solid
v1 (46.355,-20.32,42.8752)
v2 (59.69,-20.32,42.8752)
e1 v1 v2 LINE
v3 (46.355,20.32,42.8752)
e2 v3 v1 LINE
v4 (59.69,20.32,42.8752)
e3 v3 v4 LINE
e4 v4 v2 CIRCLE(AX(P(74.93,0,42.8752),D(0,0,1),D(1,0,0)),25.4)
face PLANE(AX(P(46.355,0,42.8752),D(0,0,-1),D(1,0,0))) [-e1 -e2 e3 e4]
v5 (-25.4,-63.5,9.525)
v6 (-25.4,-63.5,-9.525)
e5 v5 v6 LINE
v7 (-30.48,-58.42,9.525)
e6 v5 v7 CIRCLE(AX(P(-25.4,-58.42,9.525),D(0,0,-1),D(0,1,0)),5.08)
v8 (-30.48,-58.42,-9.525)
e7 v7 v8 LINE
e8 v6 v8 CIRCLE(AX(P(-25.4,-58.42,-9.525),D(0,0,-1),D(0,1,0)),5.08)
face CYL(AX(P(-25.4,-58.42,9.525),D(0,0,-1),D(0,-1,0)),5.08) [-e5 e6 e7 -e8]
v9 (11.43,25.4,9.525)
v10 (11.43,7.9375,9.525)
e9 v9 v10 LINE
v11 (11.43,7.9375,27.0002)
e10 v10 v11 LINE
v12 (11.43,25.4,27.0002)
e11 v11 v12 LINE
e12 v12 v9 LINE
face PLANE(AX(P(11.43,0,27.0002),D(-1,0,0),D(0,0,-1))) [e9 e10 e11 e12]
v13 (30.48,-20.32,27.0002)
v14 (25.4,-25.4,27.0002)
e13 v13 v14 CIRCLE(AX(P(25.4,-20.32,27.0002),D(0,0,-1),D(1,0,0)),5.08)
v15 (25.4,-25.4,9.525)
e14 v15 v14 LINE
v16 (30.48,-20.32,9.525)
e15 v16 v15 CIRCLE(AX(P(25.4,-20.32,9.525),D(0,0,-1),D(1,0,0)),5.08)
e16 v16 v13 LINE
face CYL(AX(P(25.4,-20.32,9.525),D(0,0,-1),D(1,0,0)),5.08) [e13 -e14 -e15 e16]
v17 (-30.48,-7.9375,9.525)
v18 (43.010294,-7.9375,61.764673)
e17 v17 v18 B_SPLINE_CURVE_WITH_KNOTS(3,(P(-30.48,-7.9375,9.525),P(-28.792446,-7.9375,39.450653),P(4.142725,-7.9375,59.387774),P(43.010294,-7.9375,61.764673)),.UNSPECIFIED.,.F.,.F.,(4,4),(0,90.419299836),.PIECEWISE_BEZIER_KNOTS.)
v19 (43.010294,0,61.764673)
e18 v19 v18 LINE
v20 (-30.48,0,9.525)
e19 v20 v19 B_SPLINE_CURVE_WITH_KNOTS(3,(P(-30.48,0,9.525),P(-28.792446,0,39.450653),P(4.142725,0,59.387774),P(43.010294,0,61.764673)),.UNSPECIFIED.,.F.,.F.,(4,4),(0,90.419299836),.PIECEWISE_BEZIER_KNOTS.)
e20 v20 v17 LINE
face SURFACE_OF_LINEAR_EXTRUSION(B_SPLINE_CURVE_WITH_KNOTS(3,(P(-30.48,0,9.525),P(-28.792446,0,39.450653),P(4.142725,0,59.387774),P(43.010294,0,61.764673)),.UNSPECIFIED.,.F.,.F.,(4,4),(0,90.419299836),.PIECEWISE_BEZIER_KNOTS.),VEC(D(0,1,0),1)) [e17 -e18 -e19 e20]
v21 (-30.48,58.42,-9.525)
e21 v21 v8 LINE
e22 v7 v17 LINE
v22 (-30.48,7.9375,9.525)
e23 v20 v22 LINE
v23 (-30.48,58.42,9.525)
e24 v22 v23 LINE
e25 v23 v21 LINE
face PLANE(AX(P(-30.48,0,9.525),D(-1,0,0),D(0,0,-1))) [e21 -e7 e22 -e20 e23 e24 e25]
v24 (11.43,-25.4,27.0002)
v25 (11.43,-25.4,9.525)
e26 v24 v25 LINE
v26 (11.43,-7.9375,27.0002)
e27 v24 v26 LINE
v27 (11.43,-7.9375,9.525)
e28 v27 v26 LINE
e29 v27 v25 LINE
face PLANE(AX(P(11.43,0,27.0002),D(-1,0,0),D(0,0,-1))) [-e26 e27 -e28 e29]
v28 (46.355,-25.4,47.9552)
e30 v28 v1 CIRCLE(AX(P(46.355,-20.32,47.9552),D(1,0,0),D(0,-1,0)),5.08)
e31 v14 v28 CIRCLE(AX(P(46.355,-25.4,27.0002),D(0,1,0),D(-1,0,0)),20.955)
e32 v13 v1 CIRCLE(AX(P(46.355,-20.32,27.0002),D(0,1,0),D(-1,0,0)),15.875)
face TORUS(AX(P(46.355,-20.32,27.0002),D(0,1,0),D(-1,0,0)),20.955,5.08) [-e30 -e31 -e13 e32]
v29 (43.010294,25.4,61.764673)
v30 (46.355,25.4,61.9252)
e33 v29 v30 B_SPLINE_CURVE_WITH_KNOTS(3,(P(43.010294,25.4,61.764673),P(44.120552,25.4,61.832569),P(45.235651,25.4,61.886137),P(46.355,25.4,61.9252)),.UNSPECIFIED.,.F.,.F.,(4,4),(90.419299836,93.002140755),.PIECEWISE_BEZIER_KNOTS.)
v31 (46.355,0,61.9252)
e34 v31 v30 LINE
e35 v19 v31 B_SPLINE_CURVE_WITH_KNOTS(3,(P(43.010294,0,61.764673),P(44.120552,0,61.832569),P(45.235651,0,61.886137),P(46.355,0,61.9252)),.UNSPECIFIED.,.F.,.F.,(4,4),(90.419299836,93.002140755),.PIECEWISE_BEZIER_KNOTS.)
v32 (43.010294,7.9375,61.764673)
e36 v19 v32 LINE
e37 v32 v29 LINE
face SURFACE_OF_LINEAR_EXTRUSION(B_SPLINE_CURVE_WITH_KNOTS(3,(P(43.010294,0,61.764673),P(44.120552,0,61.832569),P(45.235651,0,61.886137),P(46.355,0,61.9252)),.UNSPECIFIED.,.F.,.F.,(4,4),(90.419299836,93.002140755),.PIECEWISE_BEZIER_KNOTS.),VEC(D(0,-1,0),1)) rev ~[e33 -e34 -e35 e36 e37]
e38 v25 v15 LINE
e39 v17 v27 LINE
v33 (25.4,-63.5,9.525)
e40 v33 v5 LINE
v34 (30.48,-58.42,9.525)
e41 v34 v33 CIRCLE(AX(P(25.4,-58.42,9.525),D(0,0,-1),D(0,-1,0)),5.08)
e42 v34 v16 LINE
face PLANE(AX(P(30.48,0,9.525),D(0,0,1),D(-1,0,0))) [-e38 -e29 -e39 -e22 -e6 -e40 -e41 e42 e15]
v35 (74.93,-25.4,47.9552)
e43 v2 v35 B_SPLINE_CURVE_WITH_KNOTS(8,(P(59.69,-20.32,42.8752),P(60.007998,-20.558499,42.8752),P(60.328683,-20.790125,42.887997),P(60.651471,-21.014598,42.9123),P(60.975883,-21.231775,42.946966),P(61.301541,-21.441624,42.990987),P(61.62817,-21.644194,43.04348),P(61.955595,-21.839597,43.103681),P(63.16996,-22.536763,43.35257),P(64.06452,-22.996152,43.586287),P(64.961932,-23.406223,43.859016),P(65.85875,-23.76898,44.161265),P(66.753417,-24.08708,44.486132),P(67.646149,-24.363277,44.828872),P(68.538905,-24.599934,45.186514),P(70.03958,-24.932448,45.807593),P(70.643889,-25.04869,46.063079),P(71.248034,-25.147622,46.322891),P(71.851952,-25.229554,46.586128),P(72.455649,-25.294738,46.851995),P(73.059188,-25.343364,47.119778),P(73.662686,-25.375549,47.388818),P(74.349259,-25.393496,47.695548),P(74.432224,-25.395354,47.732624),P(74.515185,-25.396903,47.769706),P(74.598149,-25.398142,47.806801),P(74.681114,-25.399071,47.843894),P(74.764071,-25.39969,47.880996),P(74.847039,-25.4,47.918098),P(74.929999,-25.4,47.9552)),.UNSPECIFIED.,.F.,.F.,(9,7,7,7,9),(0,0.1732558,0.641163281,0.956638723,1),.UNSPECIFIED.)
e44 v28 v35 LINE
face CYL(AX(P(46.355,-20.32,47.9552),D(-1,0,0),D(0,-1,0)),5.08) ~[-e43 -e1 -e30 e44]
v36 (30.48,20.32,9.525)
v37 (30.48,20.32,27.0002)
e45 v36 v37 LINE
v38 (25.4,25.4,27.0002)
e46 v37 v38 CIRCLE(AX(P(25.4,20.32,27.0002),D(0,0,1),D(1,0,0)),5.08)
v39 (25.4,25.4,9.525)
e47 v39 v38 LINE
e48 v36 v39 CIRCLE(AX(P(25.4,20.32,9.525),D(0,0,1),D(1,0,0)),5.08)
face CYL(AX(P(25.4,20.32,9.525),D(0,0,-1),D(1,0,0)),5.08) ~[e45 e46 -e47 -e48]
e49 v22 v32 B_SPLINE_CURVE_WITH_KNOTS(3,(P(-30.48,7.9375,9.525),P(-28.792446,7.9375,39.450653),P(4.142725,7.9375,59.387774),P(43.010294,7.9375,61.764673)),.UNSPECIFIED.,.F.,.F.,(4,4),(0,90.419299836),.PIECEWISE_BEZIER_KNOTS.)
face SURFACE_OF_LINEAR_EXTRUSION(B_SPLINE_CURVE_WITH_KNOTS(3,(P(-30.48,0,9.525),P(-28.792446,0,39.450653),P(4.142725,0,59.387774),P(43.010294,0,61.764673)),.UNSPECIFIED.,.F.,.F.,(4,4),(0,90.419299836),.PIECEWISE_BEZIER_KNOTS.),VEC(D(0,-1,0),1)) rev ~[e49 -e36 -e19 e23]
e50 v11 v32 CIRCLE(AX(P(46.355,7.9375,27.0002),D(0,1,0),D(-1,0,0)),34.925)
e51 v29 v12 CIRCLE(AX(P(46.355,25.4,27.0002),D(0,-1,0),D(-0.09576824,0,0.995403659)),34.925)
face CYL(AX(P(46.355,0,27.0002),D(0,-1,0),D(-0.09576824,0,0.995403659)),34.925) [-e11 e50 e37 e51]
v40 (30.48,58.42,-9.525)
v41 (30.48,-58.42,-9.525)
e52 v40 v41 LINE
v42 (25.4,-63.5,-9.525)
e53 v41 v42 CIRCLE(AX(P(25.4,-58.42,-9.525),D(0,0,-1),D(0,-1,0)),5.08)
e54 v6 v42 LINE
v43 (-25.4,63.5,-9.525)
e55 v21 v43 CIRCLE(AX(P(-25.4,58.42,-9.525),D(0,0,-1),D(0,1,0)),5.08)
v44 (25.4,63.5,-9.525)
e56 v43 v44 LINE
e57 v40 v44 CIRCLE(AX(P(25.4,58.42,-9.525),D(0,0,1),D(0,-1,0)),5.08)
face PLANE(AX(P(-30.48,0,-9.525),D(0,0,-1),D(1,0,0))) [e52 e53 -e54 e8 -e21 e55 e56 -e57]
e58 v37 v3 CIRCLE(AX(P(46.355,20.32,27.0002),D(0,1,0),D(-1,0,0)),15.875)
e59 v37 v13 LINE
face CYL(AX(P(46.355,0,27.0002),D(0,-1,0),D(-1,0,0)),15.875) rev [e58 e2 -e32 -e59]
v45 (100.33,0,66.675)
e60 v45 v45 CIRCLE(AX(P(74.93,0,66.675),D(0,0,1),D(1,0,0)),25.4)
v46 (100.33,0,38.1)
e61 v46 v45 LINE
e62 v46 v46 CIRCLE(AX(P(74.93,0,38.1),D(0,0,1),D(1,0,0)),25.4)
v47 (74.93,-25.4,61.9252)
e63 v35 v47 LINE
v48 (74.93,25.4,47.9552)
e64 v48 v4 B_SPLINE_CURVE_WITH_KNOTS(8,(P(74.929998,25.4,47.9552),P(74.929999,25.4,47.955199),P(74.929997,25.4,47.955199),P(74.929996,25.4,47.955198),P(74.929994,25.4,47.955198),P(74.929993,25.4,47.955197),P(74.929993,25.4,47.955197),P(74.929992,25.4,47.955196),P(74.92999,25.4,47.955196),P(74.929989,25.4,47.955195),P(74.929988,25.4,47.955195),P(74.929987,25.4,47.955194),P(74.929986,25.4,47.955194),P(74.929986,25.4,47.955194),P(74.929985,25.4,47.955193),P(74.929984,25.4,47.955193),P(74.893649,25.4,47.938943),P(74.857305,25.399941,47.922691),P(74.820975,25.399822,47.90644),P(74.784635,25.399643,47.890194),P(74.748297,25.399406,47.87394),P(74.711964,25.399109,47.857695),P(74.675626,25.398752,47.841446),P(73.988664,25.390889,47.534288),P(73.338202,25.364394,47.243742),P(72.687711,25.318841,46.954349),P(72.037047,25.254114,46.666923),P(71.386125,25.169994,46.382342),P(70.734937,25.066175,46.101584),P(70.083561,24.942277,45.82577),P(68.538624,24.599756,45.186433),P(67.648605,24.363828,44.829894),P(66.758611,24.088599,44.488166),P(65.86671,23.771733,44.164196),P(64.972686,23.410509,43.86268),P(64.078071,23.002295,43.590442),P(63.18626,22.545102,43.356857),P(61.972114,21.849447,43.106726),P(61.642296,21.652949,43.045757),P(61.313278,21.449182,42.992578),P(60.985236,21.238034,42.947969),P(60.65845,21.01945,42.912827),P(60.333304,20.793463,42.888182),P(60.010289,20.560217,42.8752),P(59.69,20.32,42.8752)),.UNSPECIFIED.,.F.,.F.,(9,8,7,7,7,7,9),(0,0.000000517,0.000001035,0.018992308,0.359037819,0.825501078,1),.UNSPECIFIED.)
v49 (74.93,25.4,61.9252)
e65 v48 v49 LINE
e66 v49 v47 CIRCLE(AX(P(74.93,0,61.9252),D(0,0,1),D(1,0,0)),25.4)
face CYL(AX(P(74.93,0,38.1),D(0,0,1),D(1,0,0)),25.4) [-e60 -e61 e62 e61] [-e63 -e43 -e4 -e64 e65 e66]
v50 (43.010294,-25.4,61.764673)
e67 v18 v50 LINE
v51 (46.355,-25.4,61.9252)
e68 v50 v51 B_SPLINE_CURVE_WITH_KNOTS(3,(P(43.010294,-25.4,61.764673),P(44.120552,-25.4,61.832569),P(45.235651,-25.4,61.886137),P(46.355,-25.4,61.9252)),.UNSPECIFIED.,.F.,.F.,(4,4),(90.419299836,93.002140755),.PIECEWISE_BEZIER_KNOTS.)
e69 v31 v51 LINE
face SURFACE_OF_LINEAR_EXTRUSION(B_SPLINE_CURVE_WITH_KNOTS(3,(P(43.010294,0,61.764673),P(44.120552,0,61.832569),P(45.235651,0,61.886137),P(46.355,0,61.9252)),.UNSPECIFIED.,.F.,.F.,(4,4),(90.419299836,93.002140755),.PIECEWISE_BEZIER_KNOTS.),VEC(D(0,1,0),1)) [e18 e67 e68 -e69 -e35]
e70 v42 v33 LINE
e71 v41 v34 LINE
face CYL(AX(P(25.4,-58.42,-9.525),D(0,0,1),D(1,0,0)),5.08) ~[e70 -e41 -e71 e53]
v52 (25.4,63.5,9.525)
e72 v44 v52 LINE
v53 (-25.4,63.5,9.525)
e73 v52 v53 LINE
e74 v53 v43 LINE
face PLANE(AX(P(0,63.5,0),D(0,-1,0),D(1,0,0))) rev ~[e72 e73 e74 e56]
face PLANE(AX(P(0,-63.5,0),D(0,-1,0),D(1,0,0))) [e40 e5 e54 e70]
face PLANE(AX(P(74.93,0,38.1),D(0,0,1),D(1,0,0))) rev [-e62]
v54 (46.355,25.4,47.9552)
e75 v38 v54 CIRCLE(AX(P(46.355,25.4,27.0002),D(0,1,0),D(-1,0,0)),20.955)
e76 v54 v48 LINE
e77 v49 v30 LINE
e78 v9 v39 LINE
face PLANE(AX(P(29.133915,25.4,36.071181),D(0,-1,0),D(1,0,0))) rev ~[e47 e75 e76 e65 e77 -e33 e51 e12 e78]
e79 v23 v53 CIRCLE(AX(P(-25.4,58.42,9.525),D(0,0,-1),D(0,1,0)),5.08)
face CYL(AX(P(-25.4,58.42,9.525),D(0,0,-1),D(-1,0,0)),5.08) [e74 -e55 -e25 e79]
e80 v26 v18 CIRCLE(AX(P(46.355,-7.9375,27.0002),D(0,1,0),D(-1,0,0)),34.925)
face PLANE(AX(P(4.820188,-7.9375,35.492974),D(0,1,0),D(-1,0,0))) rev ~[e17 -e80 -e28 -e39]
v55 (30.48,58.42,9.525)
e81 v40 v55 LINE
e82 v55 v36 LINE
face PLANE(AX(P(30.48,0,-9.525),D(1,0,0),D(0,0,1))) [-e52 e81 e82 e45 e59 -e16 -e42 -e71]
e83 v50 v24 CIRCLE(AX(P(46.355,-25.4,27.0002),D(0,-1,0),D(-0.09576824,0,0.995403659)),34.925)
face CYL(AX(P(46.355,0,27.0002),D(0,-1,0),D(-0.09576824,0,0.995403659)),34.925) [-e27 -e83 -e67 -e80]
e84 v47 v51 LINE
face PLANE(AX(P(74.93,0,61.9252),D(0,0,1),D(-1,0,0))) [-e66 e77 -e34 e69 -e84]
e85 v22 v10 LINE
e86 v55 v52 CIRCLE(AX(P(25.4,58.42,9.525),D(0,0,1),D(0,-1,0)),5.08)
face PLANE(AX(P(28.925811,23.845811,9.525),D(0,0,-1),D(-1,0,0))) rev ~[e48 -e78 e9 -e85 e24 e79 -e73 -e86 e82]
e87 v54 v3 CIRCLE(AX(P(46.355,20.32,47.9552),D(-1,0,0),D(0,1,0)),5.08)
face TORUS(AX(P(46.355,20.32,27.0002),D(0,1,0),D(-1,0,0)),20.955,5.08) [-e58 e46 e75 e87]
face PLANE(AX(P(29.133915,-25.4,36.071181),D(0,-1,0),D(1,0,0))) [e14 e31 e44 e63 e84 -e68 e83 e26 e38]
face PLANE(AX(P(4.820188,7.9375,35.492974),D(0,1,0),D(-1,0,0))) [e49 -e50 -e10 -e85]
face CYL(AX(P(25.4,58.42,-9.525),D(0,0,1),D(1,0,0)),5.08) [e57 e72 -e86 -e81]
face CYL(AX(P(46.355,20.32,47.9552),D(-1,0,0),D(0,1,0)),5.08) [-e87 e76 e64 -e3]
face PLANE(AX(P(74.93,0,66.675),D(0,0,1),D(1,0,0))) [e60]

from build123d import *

# Parameters (mm, degrees)
F1_DEPTH     = 63.5
F0_W         = 25.4
F0_H         = 19.05
F2_DEPTH     = 25.4
F3_DEPTH     = 7.9375
F5_R         = 5.08
F6_T1_DEPTH  = 17.4752
F6_T6_DEPTH  = 50.165
F6_S7_R      = 25.4
F6_T8_DEPTH  = 27
F6_T10_ANGLE = 90
F7_T1_DEPTH  = 17.4752
F7_T6_DEPTH  = 50.165
F7_S7_R      = 25.4
F7_T8_DEPTH  = 27
F7_T10_ANGLE = 90


# Not quite as in the source:
# - a fillet or chamfer that OpenCascade refuses, or shapes differently, is made with other operations: its cross-section is extruded or revolved along the edge and cut away or added


with BuildPart() as f1:
    # F0 (on Front) → F1 (new body, symmetric)
    with BuildSketch(Plane.XZ):
        Polygon((11.43, 9.525), (-30.48, 9.525), (-30.48, -9.525), (30.48, -9.525), (30.48, 9.525), align=None)
    extrude(amount=F1_DEPTH, both=True)

    # F0 (on Front) → F2 (join, symmetric)
    with BuildSketch(Plane.XZ):
        with BuildLine():
            Line((11.43, 27.0002), (11.43, 9.525))
            Line((11.43, 9.525), (30.48, 9.525))
            Line((30.48, 9.525), (30.48, 27.0002))
            ThreePointArc((30.48, 27.0002), (35.1296798487, 38.2255201513), (46.355, 42.8752))
            Line((46.355, 42.8752), (49.53, 42.8752))
            Line((49.53, 42.8752), (49.53, 61.9252))
            Line((49.53, 61.9252), (46.355, 61.9252))
            add(Edge.make_bspline(
                [(43.0102942151, 61.7646727878), (44.1205521815, 61.8325692622), (45.2356507943, 61.8861371605), (46.355, 61.9252)],
                knots=[90.4192998356, 90.4192998356, 90.4192998356, 90.4192998356, 93.0021407551, 93.0021407551, 93.0021407551, 93.0021407551], degree=3))
            ThreePointArc((43.0102942151, 61.7646727878), (20.5037962124, 50.4836172925), (11.43, 27.0002))
        make_face()
        with Locations((62.23, 52.4002)):
            Rectangle(F0_W, F0_H)
    extrude(amount=F2_DEPTH, both=True)

    # F0 (on Front) → F3 (join, symmetric)
    with BuildSketch(Plane.XZ):
        with BuildLine():
            add(Edge.make_bspline(
                [(-30.48, 9.525), (-28.7924455478, 39.4506532923), (4.142725098, 59.3877739136), (43.0102942151, 61.7646727878)],
                knots=[0, 0, 0, 0, 90.4192998356, 90.4192998356, 90.4192998356, 90.4192998356], degree=3))
            Line((-30.48, 9.525), (11.43, 9.525))
            Line((11.43, 9.525), (11.43, 27.0002))
            ThreePointArc((11.43, 27.0002), (20.5037962124, 50.4836172925), (43.0102942151, 61.7646727878))
        make_face()
    extrude(amount=F3_DEPTH, both=True)

    # F0 (on Front) → F4 (revolve)
    with BuildSketch(Plane.XZ):
        Polygon((74.93, 66.675), (74.93, 61.9252), (74.93, 42.8752), (74.93, 38.1), (100.33, 38.1), (100.33, 66.675), align=None)
    revolve(axis=Axis((74.93, 0, 52.3875), (0, 0, 1)))

    # F5
    f5_edges = [f1.edges().sort_by_distance(p)[0] for p in [
        (30.48, -63.5, 0),
        (-30.48, -63.5, 0),
        (30.48, 63.5, 0),
        (-30.48, 63.5, 0),
    ]]
    fillet(f5_edges, radius=F5_R)

    # F6: fillet of radius 5.08 on 1 edges, made by hand

    # F6_s2 → F6_t1 (cut)
    with BuildSketch(Plane.XY.offset(9.525)):
        with BuildLine():
            ThreePointArc((30.48, -20.32), (28.9921024484, -23.9121024484), (25.4, -25.4))
            Line((25.4, -25.4), (30.48, -25.4))
            Line((30.48, -25.4), (30.48, -20.32))
        make_face()
    extrude(amount=F6_T1_DEPTH, mode=Mode.SUBTRACT)


with BuildPart() as f6_tool4:
    # F6_s5 → F6_t6 (new body)
    with BuildSketch(Plane.YZ.offset(46.355)):
        with BuildLine():
            ThreePointArc((-25.4, 47.9552), (-23.9121024484, 44.3630975516), (-20.32, 42.8752))
            Line((-20.32, 42.8752), (-25.4, 42.8752))
            Line((-25.4, 42.8752), (-25.4, 47.9552))
        make_face()
    extrude(amount=F6_T6_DEPTH)

    # F6_s7 → F6_t8 (cut, symmetric)
    with BuildSketch(Plane.XY.offset(45.4)):
        with Locations((74.93, 0)):
            Circle(F6_S7_R)
    extrude(amount=F6_T8_DEPTH, both=True, mode=Mode.SUBTRACT)


with BuildPart() as f1_1:
    add(f1.part)

    # F6_t3: cut F6_tool4
    add(f6_tool4.part, mode=Mode.SUBTRACT)

    # F6_s9 → F6_t10 (revolve, cut)
    with BuildSketch(Plane.XY.offset(27.0002)):
        with BuildLine():
            ThreePointArc((30.48, -20.32), (28.9921024484, -23.9121024484), (25.4, -25.4))
            Line((25.4, -25.4), (30.48, -25.4))
            Line((30.48, -25.4), (30.48, -20.32))
        make_face()
    revolve(axis=Axis((46.355, -25.4, 27.0002), (0, 1, 0)), revolution_arc=F6_T10_ANGLE, mode=Mode.SUBTRACT)

    # F7: fillet of radius 5.08 on 3 edges, made by hand

    # F7_s2 → F7_t1 (cut)
    with BuildSketch(Plane.XY.offset(9.525)):
        with BuildLine():
            ThreePointArc((30.48, 20.32), (28.9921024484, 23.9121024484), (25.4, 25.4))
            Line((25.4, 25.4), (30.48, 25.4))
            Line((30.48, 25.4), (30.48, 20.32))
        make_face()
    extrude(amount=F7_T1_DEPTH, mode=Mode.SUBTRACT)


with BuildPart() as f7_tool4:
    # F7_s5 → F7_t6 (new body)
    with BuildSketch(Plane.YZ.offset(46.355)):
        with BuildLine():
            ThreePointArc((25.4, 47.9552), (23.9121024484, 44.3630975516), (20.32, 42.8752))
            Line((20.32, 42.8752), (25.4, 42.8752))
            Line((25.4, 42.8752), (25.4, 47.9552))
        make_face()
    extrude(amount=F7_T6_DEPTH)

    # F7_s7 → F7_t8 (cut, symmetric)
    with BuildSketch(Plane.XY.offset(45.4)):
        with Locations((74.93, 0)):
            Circle(F7_S7_R)
    extrude(amount=F7_T8_DEPTH, both=True, mode=Mode.SUBTRACT)


with BuildPart() as f1_2:
    add(f1_1.part)

    # F7_t3: cut F7_tool4
    add(f7_tool4.part, mode=Mode.SUBTRACT)

    # F7_s9 → F7_t10 (revolve, cut)
    with BuildSketch(Plane.XY.offset(27.0002)):
        with BuildLine():
            ThreePointArc((25.4, 25.4), (28.9921024484, 23.9121024484), (30.48, 20.32))
            Line((30.48, 20.32), (30.48, 25.4))
            Line((30.48, 25.4), (25.4, 25.4))
        make_face()
    revolve(axis=Axis((46.355, 25.4, 27.0002), (0, 1, 0)), revolution_arc=F7_T10_ANGLE, mode=Mode.SUBTRACT)


solid = f1_2.part
